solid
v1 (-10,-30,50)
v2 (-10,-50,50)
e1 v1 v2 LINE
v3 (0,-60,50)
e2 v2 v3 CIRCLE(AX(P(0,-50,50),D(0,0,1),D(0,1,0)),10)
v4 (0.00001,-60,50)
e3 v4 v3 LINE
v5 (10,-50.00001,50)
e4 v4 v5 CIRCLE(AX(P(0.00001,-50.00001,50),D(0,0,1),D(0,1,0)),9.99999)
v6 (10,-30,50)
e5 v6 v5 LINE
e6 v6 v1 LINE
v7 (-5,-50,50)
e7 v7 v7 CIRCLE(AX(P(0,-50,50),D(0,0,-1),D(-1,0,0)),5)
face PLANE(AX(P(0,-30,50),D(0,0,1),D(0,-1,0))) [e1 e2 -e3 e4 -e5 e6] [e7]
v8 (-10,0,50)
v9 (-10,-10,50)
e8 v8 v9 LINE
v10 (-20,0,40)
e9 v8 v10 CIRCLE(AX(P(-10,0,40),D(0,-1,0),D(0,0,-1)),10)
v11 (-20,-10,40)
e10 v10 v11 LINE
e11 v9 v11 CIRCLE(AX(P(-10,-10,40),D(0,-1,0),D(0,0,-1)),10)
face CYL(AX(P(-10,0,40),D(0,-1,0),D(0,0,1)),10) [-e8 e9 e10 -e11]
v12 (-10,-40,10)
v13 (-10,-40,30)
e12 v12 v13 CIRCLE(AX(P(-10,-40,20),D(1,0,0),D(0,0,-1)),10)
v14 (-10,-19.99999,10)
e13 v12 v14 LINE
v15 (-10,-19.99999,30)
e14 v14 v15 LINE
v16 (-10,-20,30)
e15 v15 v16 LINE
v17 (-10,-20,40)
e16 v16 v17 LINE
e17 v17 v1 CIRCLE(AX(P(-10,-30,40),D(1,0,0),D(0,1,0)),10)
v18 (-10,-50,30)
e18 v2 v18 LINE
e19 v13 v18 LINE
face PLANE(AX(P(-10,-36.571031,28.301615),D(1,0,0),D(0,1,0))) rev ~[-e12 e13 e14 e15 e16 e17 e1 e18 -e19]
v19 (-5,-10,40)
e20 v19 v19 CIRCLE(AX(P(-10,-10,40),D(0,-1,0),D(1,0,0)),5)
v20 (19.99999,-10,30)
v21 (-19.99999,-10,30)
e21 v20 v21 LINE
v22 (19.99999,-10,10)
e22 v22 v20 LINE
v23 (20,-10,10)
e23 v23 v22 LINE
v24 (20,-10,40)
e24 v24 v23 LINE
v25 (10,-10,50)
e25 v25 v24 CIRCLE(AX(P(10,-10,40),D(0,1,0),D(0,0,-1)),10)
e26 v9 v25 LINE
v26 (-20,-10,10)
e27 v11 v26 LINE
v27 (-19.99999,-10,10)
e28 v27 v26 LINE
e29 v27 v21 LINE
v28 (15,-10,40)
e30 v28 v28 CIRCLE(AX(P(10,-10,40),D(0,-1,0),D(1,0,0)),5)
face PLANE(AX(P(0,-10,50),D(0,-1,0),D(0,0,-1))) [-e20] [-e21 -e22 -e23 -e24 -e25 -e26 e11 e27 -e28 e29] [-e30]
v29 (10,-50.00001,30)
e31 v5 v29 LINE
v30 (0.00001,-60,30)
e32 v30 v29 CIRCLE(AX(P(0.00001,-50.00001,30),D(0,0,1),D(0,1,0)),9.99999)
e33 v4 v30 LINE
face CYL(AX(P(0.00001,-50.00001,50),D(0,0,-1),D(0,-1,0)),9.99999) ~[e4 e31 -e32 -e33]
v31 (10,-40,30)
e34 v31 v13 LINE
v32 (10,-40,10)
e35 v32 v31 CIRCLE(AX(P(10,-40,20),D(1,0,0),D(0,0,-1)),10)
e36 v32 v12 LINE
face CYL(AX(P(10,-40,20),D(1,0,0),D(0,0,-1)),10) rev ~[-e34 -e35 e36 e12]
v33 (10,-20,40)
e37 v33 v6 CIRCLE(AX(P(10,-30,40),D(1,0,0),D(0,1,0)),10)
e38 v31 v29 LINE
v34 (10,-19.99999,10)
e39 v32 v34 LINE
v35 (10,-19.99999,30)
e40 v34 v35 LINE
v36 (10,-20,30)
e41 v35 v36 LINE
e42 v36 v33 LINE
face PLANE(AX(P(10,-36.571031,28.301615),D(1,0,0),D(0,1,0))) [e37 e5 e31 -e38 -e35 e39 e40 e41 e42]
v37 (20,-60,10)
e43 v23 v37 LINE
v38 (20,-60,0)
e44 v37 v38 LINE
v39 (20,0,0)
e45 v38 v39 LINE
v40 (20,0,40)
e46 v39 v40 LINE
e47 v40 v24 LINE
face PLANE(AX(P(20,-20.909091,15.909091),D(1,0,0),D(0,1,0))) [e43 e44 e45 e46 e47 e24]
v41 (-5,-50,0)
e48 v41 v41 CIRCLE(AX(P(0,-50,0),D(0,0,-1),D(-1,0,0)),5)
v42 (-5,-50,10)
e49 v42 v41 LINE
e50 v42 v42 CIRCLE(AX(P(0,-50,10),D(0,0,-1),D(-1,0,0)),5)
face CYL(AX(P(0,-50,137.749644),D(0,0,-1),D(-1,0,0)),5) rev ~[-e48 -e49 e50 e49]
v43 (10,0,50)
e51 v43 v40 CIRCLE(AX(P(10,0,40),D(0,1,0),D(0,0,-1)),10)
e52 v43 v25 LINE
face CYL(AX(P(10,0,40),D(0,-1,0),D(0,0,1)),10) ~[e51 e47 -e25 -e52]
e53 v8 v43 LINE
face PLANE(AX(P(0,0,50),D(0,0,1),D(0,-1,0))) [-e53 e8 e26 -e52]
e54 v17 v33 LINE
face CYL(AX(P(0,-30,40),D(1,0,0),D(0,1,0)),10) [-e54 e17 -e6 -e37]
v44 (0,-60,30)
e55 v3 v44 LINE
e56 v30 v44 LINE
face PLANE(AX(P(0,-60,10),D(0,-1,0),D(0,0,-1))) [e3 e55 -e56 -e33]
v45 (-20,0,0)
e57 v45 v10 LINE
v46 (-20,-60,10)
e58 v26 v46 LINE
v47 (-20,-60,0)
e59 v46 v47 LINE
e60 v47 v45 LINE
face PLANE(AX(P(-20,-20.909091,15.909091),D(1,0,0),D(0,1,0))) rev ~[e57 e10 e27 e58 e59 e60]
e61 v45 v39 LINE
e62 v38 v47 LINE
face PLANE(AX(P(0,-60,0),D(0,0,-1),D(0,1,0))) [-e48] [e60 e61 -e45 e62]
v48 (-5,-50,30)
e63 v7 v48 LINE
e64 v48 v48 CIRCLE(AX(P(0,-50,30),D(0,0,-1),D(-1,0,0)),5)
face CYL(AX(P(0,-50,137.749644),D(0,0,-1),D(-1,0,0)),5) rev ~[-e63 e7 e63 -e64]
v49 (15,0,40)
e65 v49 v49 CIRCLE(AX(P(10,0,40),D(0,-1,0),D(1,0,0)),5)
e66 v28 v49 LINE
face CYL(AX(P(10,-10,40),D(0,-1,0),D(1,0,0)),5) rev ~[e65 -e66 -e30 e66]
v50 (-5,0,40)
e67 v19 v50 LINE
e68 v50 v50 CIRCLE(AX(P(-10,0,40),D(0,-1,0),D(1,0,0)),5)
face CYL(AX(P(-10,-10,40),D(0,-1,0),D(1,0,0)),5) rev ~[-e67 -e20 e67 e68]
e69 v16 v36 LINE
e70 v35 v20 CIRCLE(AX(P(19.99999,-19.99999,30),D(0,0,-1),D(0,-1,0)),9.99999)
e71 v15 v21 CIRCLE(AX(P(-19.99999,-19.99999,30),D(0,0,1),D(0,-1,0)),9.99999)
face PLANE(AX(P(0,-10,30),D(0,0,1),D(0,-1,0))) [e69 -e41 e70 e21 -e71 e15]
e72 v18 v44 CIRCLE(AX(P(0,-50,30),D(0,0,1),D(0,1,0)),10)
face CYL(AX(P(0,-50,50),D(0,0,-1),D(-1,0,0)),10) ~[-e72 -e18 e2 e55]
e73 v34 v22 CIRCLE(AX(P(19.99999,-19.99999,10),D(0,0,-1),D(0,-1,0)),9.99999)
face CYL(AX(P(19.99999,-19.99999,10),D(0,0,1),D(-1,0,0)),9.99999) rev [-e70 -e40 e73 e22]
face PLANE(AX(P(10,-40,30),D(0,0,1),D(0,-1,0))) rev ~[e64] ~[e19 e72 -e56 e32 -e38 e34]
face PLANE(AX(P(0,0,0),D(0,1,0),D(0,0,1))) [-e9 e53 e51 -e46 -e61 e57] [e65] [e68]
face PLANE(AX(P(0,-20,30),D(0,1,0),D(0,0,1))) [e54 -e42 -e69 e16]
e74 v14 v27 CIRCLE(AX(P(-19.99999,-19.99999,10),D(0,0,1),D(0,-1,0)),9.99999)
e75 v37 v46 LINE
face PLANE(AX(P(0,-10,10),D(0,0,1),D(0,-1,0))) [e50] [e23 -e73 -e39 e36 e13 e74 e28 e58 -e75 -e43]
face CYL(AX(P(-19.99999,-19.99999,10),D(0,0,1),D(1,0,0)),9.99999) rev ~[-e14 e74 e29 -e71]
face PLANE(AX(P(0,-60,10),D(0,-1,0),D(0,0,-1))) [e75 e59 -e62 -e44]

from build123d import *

# Parameters (mm, degrees)
F1_DEPTH  = 20
F3_DEPTH  = 10
F5_DEPTH  = 20
F6_R      = 10
F6_R_2    = 9.99999
F8_D      = 10
F10_D     = 10
F10_DEPTH = 10.001


# Not quite as in the source:
# - a fillet or chamfer is up to 0.001 mm smaller than in the source, because OpenCascade refuses the exact size


with BuildPart() as f1:
    # F0 (on Right) → F1 (new body, symmetric)
    with BuildSketch(Plane.YZ):
        Polygon((-60, 0), (0, 0), (0, 50), (-10, 50), (-10, 10), (-60, 10), align=None)
    extrude(amount=F1_DEPTH, both=True)

    # F2 (on Right) → F3 (join, symmetric)
    with BuildSketch(Plane.YZ):
        with BuildLine():
            Line((-60, 10), (-10, 10))
            Line((-10, 10), (-10, 30))
            Line((-10, 30), (-20, 30))
            Line((-20, 30), (-20, 40))
            ThreePointArc((-20, 40), (-22.9289321881, 47.0710678119), (-30, 50))
            Line((-30, 50), (-60, 50))
            Line((-60, 50), (-60, 10))
        make_face()
    extrude(amount=F3_DEPTH, both=True)

    # F4 (on face) → F5 (cut, through all)
    with BuildSketch(Plane.YZ.offset(10)):
        with BuildLine():
            Line((-60, 30), (-60, 10))
            Line((-60, 10), (-40, 10))
            ThreePointArc((-40, 10), (-30, 20), (-40, 30))
            Line((-40, 30), (-60, 30))
        make_face()
    extrude(amount=-F5_DEPTH, mode=Mode.SUBTRACT)

    # F6 (call 1 of 6: OpenCascade refuses the feature's edges together)
    f6_edges = [f1.edges().sort_by_distance(p)[0] for p in [
        (-20, -5, 50),
    ]]
    fillet(f6_edges, radius=F6_R)

    # F6#2 (call 2 of 6)
    f6_2_edges = [f1.edges().sort_by_distance(p)[0] for p in [
        (20, -5, 50),
    ]]
    fillet(f6_2_edges, radius=F6_R)

    # F6#3 (call 3 of 6)
    f6_3_edges = [f1.edges().sort_by_distance(p)[0] for p in [
        (-10, -60, 40),
    ]]
    fillet(f6_3_edges, radius=F6_R)

    # F6#4 (call 4 of 6) (radius 10 in the source; OpenCascade refuses exactly that, so slightly less here)
    f6_4_edges = [f1.edges().sort_by_distance(p)[0] for p in [
        (10, -60, 40),
    ]]
    fillet(f6_4_edges, radius=F6_R_2)

    # F6#5 (call 5 of 6) (radius 10 in the source; OpenCascade refuses exactly that, so slightly less here)
    f6_5_edges = [f1.edges().sort_by_distance(p)[0] for p in [
        (10, -10, 20),
    ]]
    fillet(f6_5_edges, radius=F6_R_2)

    # F6#6 (call 6 of 6) (radius 10 in the source; OpenCascade refuses exactly that, so slightly less here)
    f6_6_edges = [f1.edges().sort_by_distance(p)[0] for p in [
        (-10, -10, 20),
    ]]
    fillet(f6_6_edges, radius=F6_R_2)

    # F8 (through all)
    with Locations(Plane.XY.offset(50)):
        with Locations((0, -50)):
            Hole(F8_D / 2)

    # F10 (through all, one way)
    with BuildSketch(Plane.XZ.offset(10)):
        with Locations((-10, 40), (10, 40)):
            Circle(F10_D / 2)
    extrude(amount=-F10_DEPTH, mode=Mode.SUBTRACT)


solid = f1.part
